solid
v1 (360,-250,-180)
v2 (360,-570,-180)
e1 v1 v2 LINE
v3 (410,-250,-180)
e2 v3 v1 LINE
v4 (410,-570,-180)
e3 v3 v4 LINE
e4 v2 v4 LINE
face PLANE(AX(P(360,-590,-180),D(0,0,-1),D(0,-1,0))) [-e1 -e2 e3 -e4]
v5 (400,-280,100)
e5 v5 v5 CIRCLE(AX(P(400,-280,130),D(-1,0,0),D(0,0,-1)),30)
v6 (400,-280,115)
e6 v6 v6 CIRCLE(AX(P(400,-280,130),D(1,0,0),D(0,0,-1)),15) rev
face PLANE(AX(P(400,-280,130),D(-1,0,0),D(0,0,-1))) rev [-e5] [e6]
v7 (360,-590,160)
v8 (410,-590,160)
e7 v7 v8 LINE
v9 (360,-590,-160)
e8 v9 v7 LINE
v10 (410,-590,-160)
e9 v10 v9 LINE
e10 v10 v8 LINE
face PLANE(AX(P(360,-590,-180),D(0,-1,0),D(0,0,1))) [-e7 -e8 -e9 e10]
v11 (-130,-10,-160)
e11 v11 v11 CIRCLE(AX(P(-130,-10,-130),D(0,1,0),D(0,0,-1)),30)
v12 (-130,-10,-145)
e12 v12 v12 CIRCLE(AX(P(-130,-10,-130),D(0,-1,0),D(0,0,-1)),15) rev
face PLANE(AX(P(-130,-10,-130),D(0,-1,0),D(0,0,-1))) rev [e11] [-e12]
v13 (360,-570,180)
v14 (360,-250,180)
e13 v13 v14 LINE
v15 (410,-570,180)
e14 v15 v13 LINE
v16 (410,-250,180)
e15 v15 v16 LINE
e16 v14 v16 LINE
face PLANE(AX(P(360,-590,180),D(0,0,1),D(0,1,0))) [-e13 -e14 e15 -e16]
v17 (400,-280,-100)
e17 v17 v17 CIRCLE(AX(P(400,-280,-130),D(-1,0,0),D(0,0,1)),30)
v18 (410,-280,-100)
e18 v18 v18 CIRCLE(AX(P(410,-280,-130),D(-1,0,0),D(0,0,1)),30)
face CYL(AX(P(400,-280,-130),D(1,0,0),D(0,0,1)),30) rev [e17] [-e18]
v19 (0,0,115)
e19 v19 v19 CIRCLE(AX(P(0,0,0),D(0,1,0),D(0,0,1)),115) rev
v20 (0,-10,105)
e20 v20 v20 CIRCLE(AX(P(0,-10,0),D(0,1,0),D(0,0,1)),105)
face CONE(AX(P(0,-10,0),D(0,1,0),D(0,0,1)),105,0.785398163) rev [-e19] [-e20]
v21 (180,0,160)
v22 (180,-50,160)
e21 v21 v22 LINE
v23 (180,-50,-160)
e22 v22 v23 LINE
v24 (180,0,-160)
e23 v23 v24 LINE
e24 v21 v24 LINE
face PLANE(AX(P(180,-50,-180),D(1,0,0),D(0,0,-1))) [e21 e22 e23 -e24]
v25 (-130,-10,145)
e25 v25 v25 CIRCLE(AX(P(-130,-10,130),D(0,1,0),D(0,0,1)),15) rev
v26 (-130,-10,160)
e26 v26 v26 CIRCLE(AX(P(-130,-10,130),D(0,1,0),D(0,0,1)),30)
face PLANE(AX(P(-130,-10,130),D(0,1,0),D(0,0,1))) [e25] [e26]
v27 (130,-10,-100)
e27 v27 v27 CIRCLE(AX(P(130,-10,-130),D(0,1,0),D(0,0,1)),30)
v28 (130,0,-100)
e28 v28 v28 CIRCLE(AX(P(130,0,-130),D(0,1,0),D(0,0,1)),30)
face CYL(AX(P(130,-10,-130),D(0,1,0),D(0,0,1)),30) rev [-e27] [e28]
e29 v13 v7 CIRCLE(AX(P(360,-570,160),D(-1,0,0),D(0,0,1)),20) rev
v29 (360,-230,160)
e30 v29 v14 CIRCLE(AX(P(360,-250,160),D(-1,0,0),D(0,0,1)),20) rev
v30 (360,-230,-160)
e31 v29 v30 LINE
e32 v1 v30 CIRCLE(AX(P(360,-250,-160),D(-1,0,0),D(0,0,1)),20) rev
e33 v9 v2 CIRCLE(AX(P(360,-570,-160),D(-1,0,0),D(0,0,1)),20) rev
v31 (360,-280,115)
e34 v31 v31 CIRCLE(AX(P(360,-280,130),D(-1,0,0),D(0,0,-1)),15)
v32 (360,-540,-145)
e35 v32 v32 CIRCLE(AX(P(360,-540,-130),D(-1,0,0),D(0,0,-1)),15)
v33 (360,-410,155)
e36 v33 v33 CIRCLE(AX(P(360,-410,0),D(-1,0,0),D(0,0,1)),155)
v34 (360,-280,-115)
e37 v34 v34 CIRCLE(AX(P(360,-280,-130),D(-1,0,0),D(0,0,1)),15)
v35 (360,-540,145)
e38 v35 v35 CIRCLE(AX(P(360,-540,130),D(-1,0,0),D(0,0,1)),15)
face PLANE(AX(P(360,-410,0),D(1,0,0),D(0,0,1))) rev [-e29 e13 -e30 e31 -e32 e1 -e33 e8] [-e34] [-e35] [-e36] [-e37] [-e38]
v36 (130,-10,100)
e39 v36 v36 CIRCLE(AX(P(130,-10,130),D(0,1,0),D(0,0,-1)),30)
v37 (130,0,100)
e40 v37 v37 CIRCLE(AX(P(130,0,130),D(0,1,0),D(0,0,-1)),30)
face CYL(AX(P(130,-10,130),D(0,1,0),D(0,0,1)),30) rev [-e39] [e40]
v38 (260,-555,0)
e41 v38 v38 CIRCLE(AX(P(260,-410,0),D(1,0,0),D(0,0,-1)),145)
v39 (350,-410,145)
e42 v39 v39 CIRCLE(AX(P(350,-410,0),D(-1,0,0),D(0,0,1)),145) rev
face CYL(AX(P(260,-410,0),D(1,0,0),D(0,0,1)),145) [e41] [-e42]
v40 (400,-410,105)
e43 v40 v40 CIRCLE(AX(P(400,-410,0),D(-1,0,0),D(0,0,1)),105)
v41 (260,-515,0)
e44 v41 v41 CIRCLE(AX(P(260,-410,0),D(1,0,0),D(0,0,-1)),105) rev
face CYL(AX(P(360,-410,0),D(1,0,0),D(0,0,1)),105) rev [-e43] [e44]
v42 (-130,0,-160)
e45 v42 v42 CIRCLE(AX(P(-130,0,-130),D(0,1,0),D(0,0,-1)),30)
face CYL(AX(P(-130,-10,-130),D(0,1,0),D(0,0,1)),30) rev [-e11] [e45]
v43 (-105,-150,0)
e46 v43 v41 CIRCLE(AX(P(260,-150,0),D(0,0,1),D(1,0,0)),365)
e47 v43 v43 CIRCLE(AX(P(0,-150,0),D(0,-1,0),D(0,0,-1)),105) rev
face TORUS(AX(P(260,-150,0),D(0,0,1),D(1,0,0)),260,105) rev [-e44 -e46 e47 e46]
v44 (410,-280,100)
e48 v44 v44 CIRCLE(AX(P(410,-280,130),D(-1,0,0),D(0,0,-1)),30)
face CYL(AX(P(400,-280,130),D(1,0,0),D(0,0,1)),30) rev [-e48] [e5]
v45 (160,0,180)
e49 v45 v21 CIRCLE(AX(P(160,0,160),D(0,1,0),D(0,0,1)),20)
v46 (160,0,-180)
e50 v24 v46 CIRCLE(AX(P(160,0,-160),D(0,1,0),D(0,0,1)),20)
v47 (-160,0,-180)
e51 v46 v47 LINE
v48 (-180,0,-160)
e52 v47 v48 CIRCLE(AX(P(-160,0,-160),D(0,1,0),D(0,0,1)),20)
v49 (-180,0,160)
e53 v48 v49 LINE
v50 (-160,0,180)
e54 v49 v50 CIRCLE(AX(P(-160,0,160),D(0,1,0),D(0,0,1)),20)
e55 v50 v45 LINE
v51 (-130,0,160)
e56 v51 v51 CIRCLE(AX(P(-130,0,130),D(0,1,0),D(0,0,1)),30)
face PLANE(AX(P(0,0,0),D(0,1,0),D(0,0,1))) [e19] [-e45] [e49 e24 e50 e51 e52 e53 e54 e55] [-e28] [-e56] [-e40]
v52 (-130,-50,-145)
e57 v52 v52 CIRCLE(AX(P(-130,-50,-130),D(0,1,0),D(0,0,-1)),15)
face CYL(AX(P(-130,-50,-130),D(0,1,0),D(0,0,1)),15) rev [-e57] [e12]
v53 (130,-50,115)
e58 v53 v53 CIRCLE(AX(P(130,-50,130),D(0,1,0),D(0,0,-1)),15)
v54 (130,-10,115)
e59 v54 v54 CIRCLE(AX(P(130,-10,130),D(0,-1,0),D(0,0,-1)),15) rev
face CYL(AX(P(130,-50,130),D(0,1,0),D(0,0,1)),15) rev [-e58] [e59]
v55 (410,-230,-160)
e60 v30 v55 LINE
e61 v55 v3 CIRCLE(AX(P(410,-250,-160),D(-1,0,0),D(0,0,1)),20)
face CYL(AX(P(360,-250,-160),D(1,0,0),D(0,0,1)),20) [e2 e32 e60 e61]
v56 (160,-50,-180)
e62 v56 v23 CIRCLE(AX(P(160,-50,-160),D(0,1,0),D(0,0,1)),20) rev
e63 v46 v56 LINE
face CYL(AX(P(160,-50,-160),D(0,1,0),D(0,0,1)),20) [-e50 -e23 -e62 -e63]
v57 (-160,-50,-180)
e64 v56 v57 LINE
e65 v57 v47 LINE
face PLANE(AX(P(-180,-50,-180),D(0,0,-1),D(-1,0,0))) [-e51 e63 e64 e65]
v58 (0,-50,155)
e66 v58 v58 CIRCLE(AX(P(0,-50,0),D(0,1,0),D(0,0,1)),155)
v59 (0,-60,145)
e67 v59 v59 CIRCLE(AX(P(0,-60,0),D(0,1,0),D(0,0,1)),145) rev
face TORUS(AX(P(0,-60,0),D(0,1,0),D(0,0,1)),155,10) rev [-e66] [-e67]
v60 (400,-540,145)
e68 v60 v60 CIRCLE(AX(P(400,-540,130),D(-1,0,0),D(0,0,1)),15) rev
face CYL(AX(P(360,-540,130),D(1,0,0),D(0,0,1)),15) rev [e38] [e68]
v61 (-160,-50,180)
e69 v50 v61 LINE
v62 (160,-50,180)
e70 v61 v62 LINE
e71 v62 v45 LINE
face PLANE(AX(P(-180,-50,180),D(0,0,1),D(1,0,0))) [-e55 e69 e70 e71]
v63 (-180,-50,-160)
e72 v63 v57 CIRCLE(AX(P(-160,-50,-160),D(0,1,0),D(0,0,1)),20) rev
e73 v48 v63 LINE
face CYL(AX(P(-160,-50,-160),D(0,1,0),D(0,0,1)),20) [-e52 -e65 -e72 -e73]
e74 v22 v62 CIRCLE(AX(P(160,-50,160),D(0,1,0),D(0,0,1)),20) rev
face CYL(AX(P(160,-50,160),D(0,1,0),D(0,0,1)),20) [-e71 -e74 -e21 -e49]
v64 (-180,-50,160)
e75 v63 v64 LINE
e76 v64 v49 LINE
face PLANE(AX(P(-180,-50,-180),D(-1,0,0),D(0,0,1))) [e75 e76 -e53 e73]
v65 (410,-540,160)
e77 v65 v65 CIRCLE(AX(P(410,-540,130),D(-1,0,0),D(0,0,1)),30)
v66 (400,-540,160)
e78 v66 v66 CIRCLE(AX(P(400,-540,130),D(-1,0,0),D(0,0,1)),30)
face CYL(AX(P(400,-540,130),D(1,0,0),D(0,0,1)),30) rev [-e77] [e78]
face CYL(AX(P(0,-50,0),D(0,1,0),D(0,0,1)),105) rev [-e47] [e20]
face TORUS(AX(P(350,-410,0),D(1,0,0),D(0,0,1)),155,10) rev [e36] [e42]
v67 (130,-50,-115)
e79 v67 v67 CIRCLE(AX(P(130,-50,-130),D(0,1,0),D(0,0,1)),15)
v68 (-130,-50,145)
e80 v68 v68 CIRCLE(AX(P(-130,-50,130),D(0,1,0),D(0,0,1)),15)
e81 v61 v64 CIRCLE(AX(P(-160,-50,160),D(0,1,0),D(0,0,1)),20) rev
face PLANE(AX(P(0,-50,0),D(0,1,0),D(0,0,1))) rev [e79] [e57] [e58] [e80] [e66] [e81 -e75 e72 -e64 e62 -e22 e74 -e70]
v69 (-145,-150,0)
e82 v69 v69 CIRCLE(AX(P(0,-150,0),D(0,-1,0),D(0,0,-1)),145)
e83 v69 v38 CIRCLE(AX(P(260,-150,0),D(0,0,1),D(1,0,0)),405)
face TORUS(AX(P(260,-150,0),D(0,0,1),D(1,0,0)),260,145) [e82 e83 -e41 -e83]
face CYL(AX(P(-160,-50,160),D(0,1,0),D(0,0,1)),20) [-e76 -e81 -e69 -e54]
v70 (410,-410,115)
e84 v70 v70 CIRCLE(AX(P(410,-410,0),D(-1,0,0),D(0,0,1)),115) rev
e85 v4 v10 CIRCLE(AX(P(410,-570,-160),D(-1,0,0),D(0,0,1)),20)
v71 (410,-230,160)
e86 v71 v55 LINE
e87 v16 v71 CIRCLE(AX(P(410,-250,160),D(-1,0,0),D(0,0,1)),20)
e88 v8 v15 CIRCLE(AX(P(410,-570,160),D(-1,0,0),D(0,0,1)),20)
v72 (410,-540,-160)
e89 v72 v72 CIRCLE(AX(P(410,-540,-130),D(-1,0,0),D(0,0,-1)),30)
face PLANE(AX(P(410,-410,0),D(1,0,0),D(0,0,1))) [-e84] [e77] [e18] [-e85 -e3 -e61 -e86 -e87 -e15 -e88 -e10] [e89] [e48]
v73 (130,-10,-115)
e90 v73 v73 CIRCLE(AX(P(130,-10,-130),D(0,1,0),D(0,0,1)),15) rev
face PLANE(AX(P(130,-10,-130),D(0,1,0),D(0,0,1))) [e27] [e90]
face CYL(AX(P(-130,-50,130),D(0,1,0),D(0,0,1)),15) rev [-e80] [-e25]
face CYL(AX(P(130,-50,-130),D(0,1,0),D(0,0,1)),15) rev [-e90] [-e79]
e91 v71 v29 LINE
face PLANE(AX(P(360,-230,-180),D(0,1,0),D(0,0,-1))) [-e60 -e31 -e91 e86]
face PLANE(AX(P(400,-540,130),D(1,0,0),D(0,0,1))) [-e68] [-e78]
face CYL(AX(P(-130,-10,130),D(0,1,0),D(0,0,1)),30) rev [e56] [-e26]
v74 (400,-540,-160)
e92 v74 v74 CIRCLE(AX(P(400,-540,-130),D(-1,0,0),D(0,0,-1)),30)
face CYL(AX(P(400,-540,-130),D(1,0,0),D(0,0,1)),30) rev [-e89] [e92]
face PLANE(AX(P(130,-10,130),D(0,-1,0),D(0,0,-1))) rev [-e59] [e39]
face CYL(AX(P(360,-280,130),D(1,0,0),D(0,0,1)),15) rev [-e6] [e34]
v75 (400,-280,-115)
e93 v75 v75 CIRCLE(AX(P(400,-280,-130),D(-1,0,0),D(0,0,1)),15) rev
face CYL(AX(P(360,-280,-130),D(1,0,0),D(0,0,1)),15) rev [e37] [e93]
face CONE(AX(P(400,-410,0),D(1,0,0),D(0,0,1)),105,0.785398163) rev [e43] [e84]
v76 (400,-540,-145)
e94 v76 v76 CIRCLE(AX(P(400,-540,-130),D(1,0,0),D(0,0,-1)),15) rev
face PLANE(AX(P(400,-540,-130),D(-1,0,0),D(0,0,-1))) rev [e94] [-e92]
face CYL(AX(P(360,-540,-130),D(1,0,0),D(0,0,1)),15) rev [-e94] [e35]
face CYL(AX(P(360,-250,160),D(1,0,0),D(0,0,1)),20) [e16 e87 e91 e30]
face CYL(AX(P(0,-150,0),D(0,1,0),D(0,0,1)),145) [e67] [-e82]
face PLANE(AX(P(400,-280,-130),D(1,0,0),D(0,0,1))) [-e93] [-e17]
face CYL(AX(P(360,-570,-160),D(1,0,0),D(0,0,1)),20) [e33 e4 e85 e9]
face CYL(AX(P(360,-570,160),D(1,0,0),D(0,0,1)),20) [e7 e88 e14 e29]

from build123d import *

# Parameters (mm, degrees)
SKETCH1_W           = 360
SKETCH1_H           = 360
SKETCH1_R           = 105
SKETCH1_R_2         = 15
BOSS_EXTRUDE1_DEPTH = 50
SKETCH2_R           = 30
CUT_EXTRUDE1_DEPTH  = 10
CHAMFER1_SIZE       = 10
SKETCH3_R           = 145
BOSS_EXTRUDE2_DEPTH = 100
SKETCH5_R           = 105
CUT_EXTRUDE2_DEPTH  = 100
FILLET1_R           = 10
FILLET2_R           = 20
SWEEP4_OUTLINE_R    = 145
SWEEP4_OUTLINE_R_2  = 105
SWEEP4_ANGLE        = 45


# Read off the part's stored shape, not the designer's step: Sweep4
with BuildPart() as part:
    # Sketch1 → Boss-Extrude1 (new body)
    with BuildSketch(Plane(origin=(0, 0, 0), x_dir=(1, 0, 0), z_dir=(0, 1, 0))):
        Rectangle(SKETCH1_W, SKETCH1_H)
        with Locations(Location((0, 0, 0), (0, 0, 270))):
            Circle(SKETCH1_R, mode=Mode.SUBTRACT)
        with Locations(Location((-130, -130, 0), (0, 0, 270))):
            Circle(SKETCH1_R_2, mode=Mode.SUBTRACT)
        with Locations(Location((130, -130, 0), (0, 0, 90))):
            Circle(SKETCH1_R_2, mode=Mode.SUBTRACT)
        with Locations(Location((130, 130, 0), (0, 0, 270))):
            Circle(SKETCH1_R_2, mode=Mode.SUBTRACT)
        with Locations(Location((-130, 130, 0), (0, 0, 90))):
            Circle(SKETCH1_R_2, mode=Mode.SUBTRACT)
    extrude(amount=-BOSS_EXTRUDE1_DEPTH)

    # Sketch2 → Cut-Extrude1 (cut)
    with BuildSketch(Plane(origin=(0, 0, 0), x_dir=(1, 0, 0), z_dir=(0, 1, 0))):
        with Locations(Location((-130, -130, 0), (0, 0, 270))):
            Circle(SKETCH2_R)
        with Locations(Location((130, -130, 0), (0, 0, 90))):
            Circle(SKETCH2_R)
        with Locations(Location((130, 130, 0), (0, 0, 270))):
            Circle(SKETCH2_R)
        with Locations(Location((-130, 130, 0), (0, 0, 90))):
            Circle(SKETCH2_R)
    extrude(amount=-CUT_EXTRUDE1_DEPTH, mode=Mode.SUBTRACT)

    # Chamfer1
    chamfer1_edges = [part.edges().sort_by_distance(p)[0] for p in [
        (0, 0, -105),
    ]]
    chamfer(chamfer1_edges, length=CHAMFER1_SIZE)

    # Sketch3 → Boss-Extrude2 (add)
    with BuildSketch(Plane.XZ.offset(50)):
        with Locations(Location((0, 0, 0), (0, 0, 270))):
            Circle(SKETCH3_R)
    extrude(amount=BOSS_EXTRUDE2_DEPTH)

    # Sketch5 → Cut-Extrude2 (cut)
    with BuildSketch(Plane(origin=(0, -50, 0), x_dir=(1, 0, 0), z_dir=(0, 1, 0))):
        with Locations(Location((0, 0, 0), (0, 0, 270))):
            Circle(SKETCH5_R)
    extrude(amount=-CUT_EXTRUDE2_DEPTH, mode=Mode.SUBTRACT)

    # Fillet1
    fillet1_edges = [part.edges().sort_by_distance(p)[0] for p in [
        (0, -50, 145),
    ]]
    fillet(fillet1_edges, radius=FILLET1_R)

    # Fillet2
    fillet2_edges = [part.edges().sort_by_distance(p)[0] for p in [
        (180, -25, 180),
        (-180, -25, 180),
        (-180, -25, -180),
        (180, -25, -180),
    ]]
    fillet(fillet2_edges, radius=FILLET2_R)

    # Sweep4 outline → Sweep4 (revolve)
    with BuildSketch(Plane(origin=(260, -150, 0), x_dir=(-1, 0, 0), z_dir=(0, 1, 0))):
        with Locations((260, 0)):
            Circle(SWEEP4_OUTLINE_R)
        with Locations((260, 0)):
            Circle(SWEEP4_OUTLINE_R_2, mode=Mode.SUBTRACT)
    revolve(axis=Axis((260, -150, 0), (0, 0, 1)), revolution_arc=SWEEP4_ANGLE)

    # Mirror2: part across plane


with BuildPart() as part_1:
    add(part.part)
    add(part.part.mirror(Plane(origin=(76.152236891, -333.847763109, 0), x_dir=(0, 0, 1), z_dir=(0.7071067811865438, -0.7071067811865512, 0))))


solid = part_1.part
